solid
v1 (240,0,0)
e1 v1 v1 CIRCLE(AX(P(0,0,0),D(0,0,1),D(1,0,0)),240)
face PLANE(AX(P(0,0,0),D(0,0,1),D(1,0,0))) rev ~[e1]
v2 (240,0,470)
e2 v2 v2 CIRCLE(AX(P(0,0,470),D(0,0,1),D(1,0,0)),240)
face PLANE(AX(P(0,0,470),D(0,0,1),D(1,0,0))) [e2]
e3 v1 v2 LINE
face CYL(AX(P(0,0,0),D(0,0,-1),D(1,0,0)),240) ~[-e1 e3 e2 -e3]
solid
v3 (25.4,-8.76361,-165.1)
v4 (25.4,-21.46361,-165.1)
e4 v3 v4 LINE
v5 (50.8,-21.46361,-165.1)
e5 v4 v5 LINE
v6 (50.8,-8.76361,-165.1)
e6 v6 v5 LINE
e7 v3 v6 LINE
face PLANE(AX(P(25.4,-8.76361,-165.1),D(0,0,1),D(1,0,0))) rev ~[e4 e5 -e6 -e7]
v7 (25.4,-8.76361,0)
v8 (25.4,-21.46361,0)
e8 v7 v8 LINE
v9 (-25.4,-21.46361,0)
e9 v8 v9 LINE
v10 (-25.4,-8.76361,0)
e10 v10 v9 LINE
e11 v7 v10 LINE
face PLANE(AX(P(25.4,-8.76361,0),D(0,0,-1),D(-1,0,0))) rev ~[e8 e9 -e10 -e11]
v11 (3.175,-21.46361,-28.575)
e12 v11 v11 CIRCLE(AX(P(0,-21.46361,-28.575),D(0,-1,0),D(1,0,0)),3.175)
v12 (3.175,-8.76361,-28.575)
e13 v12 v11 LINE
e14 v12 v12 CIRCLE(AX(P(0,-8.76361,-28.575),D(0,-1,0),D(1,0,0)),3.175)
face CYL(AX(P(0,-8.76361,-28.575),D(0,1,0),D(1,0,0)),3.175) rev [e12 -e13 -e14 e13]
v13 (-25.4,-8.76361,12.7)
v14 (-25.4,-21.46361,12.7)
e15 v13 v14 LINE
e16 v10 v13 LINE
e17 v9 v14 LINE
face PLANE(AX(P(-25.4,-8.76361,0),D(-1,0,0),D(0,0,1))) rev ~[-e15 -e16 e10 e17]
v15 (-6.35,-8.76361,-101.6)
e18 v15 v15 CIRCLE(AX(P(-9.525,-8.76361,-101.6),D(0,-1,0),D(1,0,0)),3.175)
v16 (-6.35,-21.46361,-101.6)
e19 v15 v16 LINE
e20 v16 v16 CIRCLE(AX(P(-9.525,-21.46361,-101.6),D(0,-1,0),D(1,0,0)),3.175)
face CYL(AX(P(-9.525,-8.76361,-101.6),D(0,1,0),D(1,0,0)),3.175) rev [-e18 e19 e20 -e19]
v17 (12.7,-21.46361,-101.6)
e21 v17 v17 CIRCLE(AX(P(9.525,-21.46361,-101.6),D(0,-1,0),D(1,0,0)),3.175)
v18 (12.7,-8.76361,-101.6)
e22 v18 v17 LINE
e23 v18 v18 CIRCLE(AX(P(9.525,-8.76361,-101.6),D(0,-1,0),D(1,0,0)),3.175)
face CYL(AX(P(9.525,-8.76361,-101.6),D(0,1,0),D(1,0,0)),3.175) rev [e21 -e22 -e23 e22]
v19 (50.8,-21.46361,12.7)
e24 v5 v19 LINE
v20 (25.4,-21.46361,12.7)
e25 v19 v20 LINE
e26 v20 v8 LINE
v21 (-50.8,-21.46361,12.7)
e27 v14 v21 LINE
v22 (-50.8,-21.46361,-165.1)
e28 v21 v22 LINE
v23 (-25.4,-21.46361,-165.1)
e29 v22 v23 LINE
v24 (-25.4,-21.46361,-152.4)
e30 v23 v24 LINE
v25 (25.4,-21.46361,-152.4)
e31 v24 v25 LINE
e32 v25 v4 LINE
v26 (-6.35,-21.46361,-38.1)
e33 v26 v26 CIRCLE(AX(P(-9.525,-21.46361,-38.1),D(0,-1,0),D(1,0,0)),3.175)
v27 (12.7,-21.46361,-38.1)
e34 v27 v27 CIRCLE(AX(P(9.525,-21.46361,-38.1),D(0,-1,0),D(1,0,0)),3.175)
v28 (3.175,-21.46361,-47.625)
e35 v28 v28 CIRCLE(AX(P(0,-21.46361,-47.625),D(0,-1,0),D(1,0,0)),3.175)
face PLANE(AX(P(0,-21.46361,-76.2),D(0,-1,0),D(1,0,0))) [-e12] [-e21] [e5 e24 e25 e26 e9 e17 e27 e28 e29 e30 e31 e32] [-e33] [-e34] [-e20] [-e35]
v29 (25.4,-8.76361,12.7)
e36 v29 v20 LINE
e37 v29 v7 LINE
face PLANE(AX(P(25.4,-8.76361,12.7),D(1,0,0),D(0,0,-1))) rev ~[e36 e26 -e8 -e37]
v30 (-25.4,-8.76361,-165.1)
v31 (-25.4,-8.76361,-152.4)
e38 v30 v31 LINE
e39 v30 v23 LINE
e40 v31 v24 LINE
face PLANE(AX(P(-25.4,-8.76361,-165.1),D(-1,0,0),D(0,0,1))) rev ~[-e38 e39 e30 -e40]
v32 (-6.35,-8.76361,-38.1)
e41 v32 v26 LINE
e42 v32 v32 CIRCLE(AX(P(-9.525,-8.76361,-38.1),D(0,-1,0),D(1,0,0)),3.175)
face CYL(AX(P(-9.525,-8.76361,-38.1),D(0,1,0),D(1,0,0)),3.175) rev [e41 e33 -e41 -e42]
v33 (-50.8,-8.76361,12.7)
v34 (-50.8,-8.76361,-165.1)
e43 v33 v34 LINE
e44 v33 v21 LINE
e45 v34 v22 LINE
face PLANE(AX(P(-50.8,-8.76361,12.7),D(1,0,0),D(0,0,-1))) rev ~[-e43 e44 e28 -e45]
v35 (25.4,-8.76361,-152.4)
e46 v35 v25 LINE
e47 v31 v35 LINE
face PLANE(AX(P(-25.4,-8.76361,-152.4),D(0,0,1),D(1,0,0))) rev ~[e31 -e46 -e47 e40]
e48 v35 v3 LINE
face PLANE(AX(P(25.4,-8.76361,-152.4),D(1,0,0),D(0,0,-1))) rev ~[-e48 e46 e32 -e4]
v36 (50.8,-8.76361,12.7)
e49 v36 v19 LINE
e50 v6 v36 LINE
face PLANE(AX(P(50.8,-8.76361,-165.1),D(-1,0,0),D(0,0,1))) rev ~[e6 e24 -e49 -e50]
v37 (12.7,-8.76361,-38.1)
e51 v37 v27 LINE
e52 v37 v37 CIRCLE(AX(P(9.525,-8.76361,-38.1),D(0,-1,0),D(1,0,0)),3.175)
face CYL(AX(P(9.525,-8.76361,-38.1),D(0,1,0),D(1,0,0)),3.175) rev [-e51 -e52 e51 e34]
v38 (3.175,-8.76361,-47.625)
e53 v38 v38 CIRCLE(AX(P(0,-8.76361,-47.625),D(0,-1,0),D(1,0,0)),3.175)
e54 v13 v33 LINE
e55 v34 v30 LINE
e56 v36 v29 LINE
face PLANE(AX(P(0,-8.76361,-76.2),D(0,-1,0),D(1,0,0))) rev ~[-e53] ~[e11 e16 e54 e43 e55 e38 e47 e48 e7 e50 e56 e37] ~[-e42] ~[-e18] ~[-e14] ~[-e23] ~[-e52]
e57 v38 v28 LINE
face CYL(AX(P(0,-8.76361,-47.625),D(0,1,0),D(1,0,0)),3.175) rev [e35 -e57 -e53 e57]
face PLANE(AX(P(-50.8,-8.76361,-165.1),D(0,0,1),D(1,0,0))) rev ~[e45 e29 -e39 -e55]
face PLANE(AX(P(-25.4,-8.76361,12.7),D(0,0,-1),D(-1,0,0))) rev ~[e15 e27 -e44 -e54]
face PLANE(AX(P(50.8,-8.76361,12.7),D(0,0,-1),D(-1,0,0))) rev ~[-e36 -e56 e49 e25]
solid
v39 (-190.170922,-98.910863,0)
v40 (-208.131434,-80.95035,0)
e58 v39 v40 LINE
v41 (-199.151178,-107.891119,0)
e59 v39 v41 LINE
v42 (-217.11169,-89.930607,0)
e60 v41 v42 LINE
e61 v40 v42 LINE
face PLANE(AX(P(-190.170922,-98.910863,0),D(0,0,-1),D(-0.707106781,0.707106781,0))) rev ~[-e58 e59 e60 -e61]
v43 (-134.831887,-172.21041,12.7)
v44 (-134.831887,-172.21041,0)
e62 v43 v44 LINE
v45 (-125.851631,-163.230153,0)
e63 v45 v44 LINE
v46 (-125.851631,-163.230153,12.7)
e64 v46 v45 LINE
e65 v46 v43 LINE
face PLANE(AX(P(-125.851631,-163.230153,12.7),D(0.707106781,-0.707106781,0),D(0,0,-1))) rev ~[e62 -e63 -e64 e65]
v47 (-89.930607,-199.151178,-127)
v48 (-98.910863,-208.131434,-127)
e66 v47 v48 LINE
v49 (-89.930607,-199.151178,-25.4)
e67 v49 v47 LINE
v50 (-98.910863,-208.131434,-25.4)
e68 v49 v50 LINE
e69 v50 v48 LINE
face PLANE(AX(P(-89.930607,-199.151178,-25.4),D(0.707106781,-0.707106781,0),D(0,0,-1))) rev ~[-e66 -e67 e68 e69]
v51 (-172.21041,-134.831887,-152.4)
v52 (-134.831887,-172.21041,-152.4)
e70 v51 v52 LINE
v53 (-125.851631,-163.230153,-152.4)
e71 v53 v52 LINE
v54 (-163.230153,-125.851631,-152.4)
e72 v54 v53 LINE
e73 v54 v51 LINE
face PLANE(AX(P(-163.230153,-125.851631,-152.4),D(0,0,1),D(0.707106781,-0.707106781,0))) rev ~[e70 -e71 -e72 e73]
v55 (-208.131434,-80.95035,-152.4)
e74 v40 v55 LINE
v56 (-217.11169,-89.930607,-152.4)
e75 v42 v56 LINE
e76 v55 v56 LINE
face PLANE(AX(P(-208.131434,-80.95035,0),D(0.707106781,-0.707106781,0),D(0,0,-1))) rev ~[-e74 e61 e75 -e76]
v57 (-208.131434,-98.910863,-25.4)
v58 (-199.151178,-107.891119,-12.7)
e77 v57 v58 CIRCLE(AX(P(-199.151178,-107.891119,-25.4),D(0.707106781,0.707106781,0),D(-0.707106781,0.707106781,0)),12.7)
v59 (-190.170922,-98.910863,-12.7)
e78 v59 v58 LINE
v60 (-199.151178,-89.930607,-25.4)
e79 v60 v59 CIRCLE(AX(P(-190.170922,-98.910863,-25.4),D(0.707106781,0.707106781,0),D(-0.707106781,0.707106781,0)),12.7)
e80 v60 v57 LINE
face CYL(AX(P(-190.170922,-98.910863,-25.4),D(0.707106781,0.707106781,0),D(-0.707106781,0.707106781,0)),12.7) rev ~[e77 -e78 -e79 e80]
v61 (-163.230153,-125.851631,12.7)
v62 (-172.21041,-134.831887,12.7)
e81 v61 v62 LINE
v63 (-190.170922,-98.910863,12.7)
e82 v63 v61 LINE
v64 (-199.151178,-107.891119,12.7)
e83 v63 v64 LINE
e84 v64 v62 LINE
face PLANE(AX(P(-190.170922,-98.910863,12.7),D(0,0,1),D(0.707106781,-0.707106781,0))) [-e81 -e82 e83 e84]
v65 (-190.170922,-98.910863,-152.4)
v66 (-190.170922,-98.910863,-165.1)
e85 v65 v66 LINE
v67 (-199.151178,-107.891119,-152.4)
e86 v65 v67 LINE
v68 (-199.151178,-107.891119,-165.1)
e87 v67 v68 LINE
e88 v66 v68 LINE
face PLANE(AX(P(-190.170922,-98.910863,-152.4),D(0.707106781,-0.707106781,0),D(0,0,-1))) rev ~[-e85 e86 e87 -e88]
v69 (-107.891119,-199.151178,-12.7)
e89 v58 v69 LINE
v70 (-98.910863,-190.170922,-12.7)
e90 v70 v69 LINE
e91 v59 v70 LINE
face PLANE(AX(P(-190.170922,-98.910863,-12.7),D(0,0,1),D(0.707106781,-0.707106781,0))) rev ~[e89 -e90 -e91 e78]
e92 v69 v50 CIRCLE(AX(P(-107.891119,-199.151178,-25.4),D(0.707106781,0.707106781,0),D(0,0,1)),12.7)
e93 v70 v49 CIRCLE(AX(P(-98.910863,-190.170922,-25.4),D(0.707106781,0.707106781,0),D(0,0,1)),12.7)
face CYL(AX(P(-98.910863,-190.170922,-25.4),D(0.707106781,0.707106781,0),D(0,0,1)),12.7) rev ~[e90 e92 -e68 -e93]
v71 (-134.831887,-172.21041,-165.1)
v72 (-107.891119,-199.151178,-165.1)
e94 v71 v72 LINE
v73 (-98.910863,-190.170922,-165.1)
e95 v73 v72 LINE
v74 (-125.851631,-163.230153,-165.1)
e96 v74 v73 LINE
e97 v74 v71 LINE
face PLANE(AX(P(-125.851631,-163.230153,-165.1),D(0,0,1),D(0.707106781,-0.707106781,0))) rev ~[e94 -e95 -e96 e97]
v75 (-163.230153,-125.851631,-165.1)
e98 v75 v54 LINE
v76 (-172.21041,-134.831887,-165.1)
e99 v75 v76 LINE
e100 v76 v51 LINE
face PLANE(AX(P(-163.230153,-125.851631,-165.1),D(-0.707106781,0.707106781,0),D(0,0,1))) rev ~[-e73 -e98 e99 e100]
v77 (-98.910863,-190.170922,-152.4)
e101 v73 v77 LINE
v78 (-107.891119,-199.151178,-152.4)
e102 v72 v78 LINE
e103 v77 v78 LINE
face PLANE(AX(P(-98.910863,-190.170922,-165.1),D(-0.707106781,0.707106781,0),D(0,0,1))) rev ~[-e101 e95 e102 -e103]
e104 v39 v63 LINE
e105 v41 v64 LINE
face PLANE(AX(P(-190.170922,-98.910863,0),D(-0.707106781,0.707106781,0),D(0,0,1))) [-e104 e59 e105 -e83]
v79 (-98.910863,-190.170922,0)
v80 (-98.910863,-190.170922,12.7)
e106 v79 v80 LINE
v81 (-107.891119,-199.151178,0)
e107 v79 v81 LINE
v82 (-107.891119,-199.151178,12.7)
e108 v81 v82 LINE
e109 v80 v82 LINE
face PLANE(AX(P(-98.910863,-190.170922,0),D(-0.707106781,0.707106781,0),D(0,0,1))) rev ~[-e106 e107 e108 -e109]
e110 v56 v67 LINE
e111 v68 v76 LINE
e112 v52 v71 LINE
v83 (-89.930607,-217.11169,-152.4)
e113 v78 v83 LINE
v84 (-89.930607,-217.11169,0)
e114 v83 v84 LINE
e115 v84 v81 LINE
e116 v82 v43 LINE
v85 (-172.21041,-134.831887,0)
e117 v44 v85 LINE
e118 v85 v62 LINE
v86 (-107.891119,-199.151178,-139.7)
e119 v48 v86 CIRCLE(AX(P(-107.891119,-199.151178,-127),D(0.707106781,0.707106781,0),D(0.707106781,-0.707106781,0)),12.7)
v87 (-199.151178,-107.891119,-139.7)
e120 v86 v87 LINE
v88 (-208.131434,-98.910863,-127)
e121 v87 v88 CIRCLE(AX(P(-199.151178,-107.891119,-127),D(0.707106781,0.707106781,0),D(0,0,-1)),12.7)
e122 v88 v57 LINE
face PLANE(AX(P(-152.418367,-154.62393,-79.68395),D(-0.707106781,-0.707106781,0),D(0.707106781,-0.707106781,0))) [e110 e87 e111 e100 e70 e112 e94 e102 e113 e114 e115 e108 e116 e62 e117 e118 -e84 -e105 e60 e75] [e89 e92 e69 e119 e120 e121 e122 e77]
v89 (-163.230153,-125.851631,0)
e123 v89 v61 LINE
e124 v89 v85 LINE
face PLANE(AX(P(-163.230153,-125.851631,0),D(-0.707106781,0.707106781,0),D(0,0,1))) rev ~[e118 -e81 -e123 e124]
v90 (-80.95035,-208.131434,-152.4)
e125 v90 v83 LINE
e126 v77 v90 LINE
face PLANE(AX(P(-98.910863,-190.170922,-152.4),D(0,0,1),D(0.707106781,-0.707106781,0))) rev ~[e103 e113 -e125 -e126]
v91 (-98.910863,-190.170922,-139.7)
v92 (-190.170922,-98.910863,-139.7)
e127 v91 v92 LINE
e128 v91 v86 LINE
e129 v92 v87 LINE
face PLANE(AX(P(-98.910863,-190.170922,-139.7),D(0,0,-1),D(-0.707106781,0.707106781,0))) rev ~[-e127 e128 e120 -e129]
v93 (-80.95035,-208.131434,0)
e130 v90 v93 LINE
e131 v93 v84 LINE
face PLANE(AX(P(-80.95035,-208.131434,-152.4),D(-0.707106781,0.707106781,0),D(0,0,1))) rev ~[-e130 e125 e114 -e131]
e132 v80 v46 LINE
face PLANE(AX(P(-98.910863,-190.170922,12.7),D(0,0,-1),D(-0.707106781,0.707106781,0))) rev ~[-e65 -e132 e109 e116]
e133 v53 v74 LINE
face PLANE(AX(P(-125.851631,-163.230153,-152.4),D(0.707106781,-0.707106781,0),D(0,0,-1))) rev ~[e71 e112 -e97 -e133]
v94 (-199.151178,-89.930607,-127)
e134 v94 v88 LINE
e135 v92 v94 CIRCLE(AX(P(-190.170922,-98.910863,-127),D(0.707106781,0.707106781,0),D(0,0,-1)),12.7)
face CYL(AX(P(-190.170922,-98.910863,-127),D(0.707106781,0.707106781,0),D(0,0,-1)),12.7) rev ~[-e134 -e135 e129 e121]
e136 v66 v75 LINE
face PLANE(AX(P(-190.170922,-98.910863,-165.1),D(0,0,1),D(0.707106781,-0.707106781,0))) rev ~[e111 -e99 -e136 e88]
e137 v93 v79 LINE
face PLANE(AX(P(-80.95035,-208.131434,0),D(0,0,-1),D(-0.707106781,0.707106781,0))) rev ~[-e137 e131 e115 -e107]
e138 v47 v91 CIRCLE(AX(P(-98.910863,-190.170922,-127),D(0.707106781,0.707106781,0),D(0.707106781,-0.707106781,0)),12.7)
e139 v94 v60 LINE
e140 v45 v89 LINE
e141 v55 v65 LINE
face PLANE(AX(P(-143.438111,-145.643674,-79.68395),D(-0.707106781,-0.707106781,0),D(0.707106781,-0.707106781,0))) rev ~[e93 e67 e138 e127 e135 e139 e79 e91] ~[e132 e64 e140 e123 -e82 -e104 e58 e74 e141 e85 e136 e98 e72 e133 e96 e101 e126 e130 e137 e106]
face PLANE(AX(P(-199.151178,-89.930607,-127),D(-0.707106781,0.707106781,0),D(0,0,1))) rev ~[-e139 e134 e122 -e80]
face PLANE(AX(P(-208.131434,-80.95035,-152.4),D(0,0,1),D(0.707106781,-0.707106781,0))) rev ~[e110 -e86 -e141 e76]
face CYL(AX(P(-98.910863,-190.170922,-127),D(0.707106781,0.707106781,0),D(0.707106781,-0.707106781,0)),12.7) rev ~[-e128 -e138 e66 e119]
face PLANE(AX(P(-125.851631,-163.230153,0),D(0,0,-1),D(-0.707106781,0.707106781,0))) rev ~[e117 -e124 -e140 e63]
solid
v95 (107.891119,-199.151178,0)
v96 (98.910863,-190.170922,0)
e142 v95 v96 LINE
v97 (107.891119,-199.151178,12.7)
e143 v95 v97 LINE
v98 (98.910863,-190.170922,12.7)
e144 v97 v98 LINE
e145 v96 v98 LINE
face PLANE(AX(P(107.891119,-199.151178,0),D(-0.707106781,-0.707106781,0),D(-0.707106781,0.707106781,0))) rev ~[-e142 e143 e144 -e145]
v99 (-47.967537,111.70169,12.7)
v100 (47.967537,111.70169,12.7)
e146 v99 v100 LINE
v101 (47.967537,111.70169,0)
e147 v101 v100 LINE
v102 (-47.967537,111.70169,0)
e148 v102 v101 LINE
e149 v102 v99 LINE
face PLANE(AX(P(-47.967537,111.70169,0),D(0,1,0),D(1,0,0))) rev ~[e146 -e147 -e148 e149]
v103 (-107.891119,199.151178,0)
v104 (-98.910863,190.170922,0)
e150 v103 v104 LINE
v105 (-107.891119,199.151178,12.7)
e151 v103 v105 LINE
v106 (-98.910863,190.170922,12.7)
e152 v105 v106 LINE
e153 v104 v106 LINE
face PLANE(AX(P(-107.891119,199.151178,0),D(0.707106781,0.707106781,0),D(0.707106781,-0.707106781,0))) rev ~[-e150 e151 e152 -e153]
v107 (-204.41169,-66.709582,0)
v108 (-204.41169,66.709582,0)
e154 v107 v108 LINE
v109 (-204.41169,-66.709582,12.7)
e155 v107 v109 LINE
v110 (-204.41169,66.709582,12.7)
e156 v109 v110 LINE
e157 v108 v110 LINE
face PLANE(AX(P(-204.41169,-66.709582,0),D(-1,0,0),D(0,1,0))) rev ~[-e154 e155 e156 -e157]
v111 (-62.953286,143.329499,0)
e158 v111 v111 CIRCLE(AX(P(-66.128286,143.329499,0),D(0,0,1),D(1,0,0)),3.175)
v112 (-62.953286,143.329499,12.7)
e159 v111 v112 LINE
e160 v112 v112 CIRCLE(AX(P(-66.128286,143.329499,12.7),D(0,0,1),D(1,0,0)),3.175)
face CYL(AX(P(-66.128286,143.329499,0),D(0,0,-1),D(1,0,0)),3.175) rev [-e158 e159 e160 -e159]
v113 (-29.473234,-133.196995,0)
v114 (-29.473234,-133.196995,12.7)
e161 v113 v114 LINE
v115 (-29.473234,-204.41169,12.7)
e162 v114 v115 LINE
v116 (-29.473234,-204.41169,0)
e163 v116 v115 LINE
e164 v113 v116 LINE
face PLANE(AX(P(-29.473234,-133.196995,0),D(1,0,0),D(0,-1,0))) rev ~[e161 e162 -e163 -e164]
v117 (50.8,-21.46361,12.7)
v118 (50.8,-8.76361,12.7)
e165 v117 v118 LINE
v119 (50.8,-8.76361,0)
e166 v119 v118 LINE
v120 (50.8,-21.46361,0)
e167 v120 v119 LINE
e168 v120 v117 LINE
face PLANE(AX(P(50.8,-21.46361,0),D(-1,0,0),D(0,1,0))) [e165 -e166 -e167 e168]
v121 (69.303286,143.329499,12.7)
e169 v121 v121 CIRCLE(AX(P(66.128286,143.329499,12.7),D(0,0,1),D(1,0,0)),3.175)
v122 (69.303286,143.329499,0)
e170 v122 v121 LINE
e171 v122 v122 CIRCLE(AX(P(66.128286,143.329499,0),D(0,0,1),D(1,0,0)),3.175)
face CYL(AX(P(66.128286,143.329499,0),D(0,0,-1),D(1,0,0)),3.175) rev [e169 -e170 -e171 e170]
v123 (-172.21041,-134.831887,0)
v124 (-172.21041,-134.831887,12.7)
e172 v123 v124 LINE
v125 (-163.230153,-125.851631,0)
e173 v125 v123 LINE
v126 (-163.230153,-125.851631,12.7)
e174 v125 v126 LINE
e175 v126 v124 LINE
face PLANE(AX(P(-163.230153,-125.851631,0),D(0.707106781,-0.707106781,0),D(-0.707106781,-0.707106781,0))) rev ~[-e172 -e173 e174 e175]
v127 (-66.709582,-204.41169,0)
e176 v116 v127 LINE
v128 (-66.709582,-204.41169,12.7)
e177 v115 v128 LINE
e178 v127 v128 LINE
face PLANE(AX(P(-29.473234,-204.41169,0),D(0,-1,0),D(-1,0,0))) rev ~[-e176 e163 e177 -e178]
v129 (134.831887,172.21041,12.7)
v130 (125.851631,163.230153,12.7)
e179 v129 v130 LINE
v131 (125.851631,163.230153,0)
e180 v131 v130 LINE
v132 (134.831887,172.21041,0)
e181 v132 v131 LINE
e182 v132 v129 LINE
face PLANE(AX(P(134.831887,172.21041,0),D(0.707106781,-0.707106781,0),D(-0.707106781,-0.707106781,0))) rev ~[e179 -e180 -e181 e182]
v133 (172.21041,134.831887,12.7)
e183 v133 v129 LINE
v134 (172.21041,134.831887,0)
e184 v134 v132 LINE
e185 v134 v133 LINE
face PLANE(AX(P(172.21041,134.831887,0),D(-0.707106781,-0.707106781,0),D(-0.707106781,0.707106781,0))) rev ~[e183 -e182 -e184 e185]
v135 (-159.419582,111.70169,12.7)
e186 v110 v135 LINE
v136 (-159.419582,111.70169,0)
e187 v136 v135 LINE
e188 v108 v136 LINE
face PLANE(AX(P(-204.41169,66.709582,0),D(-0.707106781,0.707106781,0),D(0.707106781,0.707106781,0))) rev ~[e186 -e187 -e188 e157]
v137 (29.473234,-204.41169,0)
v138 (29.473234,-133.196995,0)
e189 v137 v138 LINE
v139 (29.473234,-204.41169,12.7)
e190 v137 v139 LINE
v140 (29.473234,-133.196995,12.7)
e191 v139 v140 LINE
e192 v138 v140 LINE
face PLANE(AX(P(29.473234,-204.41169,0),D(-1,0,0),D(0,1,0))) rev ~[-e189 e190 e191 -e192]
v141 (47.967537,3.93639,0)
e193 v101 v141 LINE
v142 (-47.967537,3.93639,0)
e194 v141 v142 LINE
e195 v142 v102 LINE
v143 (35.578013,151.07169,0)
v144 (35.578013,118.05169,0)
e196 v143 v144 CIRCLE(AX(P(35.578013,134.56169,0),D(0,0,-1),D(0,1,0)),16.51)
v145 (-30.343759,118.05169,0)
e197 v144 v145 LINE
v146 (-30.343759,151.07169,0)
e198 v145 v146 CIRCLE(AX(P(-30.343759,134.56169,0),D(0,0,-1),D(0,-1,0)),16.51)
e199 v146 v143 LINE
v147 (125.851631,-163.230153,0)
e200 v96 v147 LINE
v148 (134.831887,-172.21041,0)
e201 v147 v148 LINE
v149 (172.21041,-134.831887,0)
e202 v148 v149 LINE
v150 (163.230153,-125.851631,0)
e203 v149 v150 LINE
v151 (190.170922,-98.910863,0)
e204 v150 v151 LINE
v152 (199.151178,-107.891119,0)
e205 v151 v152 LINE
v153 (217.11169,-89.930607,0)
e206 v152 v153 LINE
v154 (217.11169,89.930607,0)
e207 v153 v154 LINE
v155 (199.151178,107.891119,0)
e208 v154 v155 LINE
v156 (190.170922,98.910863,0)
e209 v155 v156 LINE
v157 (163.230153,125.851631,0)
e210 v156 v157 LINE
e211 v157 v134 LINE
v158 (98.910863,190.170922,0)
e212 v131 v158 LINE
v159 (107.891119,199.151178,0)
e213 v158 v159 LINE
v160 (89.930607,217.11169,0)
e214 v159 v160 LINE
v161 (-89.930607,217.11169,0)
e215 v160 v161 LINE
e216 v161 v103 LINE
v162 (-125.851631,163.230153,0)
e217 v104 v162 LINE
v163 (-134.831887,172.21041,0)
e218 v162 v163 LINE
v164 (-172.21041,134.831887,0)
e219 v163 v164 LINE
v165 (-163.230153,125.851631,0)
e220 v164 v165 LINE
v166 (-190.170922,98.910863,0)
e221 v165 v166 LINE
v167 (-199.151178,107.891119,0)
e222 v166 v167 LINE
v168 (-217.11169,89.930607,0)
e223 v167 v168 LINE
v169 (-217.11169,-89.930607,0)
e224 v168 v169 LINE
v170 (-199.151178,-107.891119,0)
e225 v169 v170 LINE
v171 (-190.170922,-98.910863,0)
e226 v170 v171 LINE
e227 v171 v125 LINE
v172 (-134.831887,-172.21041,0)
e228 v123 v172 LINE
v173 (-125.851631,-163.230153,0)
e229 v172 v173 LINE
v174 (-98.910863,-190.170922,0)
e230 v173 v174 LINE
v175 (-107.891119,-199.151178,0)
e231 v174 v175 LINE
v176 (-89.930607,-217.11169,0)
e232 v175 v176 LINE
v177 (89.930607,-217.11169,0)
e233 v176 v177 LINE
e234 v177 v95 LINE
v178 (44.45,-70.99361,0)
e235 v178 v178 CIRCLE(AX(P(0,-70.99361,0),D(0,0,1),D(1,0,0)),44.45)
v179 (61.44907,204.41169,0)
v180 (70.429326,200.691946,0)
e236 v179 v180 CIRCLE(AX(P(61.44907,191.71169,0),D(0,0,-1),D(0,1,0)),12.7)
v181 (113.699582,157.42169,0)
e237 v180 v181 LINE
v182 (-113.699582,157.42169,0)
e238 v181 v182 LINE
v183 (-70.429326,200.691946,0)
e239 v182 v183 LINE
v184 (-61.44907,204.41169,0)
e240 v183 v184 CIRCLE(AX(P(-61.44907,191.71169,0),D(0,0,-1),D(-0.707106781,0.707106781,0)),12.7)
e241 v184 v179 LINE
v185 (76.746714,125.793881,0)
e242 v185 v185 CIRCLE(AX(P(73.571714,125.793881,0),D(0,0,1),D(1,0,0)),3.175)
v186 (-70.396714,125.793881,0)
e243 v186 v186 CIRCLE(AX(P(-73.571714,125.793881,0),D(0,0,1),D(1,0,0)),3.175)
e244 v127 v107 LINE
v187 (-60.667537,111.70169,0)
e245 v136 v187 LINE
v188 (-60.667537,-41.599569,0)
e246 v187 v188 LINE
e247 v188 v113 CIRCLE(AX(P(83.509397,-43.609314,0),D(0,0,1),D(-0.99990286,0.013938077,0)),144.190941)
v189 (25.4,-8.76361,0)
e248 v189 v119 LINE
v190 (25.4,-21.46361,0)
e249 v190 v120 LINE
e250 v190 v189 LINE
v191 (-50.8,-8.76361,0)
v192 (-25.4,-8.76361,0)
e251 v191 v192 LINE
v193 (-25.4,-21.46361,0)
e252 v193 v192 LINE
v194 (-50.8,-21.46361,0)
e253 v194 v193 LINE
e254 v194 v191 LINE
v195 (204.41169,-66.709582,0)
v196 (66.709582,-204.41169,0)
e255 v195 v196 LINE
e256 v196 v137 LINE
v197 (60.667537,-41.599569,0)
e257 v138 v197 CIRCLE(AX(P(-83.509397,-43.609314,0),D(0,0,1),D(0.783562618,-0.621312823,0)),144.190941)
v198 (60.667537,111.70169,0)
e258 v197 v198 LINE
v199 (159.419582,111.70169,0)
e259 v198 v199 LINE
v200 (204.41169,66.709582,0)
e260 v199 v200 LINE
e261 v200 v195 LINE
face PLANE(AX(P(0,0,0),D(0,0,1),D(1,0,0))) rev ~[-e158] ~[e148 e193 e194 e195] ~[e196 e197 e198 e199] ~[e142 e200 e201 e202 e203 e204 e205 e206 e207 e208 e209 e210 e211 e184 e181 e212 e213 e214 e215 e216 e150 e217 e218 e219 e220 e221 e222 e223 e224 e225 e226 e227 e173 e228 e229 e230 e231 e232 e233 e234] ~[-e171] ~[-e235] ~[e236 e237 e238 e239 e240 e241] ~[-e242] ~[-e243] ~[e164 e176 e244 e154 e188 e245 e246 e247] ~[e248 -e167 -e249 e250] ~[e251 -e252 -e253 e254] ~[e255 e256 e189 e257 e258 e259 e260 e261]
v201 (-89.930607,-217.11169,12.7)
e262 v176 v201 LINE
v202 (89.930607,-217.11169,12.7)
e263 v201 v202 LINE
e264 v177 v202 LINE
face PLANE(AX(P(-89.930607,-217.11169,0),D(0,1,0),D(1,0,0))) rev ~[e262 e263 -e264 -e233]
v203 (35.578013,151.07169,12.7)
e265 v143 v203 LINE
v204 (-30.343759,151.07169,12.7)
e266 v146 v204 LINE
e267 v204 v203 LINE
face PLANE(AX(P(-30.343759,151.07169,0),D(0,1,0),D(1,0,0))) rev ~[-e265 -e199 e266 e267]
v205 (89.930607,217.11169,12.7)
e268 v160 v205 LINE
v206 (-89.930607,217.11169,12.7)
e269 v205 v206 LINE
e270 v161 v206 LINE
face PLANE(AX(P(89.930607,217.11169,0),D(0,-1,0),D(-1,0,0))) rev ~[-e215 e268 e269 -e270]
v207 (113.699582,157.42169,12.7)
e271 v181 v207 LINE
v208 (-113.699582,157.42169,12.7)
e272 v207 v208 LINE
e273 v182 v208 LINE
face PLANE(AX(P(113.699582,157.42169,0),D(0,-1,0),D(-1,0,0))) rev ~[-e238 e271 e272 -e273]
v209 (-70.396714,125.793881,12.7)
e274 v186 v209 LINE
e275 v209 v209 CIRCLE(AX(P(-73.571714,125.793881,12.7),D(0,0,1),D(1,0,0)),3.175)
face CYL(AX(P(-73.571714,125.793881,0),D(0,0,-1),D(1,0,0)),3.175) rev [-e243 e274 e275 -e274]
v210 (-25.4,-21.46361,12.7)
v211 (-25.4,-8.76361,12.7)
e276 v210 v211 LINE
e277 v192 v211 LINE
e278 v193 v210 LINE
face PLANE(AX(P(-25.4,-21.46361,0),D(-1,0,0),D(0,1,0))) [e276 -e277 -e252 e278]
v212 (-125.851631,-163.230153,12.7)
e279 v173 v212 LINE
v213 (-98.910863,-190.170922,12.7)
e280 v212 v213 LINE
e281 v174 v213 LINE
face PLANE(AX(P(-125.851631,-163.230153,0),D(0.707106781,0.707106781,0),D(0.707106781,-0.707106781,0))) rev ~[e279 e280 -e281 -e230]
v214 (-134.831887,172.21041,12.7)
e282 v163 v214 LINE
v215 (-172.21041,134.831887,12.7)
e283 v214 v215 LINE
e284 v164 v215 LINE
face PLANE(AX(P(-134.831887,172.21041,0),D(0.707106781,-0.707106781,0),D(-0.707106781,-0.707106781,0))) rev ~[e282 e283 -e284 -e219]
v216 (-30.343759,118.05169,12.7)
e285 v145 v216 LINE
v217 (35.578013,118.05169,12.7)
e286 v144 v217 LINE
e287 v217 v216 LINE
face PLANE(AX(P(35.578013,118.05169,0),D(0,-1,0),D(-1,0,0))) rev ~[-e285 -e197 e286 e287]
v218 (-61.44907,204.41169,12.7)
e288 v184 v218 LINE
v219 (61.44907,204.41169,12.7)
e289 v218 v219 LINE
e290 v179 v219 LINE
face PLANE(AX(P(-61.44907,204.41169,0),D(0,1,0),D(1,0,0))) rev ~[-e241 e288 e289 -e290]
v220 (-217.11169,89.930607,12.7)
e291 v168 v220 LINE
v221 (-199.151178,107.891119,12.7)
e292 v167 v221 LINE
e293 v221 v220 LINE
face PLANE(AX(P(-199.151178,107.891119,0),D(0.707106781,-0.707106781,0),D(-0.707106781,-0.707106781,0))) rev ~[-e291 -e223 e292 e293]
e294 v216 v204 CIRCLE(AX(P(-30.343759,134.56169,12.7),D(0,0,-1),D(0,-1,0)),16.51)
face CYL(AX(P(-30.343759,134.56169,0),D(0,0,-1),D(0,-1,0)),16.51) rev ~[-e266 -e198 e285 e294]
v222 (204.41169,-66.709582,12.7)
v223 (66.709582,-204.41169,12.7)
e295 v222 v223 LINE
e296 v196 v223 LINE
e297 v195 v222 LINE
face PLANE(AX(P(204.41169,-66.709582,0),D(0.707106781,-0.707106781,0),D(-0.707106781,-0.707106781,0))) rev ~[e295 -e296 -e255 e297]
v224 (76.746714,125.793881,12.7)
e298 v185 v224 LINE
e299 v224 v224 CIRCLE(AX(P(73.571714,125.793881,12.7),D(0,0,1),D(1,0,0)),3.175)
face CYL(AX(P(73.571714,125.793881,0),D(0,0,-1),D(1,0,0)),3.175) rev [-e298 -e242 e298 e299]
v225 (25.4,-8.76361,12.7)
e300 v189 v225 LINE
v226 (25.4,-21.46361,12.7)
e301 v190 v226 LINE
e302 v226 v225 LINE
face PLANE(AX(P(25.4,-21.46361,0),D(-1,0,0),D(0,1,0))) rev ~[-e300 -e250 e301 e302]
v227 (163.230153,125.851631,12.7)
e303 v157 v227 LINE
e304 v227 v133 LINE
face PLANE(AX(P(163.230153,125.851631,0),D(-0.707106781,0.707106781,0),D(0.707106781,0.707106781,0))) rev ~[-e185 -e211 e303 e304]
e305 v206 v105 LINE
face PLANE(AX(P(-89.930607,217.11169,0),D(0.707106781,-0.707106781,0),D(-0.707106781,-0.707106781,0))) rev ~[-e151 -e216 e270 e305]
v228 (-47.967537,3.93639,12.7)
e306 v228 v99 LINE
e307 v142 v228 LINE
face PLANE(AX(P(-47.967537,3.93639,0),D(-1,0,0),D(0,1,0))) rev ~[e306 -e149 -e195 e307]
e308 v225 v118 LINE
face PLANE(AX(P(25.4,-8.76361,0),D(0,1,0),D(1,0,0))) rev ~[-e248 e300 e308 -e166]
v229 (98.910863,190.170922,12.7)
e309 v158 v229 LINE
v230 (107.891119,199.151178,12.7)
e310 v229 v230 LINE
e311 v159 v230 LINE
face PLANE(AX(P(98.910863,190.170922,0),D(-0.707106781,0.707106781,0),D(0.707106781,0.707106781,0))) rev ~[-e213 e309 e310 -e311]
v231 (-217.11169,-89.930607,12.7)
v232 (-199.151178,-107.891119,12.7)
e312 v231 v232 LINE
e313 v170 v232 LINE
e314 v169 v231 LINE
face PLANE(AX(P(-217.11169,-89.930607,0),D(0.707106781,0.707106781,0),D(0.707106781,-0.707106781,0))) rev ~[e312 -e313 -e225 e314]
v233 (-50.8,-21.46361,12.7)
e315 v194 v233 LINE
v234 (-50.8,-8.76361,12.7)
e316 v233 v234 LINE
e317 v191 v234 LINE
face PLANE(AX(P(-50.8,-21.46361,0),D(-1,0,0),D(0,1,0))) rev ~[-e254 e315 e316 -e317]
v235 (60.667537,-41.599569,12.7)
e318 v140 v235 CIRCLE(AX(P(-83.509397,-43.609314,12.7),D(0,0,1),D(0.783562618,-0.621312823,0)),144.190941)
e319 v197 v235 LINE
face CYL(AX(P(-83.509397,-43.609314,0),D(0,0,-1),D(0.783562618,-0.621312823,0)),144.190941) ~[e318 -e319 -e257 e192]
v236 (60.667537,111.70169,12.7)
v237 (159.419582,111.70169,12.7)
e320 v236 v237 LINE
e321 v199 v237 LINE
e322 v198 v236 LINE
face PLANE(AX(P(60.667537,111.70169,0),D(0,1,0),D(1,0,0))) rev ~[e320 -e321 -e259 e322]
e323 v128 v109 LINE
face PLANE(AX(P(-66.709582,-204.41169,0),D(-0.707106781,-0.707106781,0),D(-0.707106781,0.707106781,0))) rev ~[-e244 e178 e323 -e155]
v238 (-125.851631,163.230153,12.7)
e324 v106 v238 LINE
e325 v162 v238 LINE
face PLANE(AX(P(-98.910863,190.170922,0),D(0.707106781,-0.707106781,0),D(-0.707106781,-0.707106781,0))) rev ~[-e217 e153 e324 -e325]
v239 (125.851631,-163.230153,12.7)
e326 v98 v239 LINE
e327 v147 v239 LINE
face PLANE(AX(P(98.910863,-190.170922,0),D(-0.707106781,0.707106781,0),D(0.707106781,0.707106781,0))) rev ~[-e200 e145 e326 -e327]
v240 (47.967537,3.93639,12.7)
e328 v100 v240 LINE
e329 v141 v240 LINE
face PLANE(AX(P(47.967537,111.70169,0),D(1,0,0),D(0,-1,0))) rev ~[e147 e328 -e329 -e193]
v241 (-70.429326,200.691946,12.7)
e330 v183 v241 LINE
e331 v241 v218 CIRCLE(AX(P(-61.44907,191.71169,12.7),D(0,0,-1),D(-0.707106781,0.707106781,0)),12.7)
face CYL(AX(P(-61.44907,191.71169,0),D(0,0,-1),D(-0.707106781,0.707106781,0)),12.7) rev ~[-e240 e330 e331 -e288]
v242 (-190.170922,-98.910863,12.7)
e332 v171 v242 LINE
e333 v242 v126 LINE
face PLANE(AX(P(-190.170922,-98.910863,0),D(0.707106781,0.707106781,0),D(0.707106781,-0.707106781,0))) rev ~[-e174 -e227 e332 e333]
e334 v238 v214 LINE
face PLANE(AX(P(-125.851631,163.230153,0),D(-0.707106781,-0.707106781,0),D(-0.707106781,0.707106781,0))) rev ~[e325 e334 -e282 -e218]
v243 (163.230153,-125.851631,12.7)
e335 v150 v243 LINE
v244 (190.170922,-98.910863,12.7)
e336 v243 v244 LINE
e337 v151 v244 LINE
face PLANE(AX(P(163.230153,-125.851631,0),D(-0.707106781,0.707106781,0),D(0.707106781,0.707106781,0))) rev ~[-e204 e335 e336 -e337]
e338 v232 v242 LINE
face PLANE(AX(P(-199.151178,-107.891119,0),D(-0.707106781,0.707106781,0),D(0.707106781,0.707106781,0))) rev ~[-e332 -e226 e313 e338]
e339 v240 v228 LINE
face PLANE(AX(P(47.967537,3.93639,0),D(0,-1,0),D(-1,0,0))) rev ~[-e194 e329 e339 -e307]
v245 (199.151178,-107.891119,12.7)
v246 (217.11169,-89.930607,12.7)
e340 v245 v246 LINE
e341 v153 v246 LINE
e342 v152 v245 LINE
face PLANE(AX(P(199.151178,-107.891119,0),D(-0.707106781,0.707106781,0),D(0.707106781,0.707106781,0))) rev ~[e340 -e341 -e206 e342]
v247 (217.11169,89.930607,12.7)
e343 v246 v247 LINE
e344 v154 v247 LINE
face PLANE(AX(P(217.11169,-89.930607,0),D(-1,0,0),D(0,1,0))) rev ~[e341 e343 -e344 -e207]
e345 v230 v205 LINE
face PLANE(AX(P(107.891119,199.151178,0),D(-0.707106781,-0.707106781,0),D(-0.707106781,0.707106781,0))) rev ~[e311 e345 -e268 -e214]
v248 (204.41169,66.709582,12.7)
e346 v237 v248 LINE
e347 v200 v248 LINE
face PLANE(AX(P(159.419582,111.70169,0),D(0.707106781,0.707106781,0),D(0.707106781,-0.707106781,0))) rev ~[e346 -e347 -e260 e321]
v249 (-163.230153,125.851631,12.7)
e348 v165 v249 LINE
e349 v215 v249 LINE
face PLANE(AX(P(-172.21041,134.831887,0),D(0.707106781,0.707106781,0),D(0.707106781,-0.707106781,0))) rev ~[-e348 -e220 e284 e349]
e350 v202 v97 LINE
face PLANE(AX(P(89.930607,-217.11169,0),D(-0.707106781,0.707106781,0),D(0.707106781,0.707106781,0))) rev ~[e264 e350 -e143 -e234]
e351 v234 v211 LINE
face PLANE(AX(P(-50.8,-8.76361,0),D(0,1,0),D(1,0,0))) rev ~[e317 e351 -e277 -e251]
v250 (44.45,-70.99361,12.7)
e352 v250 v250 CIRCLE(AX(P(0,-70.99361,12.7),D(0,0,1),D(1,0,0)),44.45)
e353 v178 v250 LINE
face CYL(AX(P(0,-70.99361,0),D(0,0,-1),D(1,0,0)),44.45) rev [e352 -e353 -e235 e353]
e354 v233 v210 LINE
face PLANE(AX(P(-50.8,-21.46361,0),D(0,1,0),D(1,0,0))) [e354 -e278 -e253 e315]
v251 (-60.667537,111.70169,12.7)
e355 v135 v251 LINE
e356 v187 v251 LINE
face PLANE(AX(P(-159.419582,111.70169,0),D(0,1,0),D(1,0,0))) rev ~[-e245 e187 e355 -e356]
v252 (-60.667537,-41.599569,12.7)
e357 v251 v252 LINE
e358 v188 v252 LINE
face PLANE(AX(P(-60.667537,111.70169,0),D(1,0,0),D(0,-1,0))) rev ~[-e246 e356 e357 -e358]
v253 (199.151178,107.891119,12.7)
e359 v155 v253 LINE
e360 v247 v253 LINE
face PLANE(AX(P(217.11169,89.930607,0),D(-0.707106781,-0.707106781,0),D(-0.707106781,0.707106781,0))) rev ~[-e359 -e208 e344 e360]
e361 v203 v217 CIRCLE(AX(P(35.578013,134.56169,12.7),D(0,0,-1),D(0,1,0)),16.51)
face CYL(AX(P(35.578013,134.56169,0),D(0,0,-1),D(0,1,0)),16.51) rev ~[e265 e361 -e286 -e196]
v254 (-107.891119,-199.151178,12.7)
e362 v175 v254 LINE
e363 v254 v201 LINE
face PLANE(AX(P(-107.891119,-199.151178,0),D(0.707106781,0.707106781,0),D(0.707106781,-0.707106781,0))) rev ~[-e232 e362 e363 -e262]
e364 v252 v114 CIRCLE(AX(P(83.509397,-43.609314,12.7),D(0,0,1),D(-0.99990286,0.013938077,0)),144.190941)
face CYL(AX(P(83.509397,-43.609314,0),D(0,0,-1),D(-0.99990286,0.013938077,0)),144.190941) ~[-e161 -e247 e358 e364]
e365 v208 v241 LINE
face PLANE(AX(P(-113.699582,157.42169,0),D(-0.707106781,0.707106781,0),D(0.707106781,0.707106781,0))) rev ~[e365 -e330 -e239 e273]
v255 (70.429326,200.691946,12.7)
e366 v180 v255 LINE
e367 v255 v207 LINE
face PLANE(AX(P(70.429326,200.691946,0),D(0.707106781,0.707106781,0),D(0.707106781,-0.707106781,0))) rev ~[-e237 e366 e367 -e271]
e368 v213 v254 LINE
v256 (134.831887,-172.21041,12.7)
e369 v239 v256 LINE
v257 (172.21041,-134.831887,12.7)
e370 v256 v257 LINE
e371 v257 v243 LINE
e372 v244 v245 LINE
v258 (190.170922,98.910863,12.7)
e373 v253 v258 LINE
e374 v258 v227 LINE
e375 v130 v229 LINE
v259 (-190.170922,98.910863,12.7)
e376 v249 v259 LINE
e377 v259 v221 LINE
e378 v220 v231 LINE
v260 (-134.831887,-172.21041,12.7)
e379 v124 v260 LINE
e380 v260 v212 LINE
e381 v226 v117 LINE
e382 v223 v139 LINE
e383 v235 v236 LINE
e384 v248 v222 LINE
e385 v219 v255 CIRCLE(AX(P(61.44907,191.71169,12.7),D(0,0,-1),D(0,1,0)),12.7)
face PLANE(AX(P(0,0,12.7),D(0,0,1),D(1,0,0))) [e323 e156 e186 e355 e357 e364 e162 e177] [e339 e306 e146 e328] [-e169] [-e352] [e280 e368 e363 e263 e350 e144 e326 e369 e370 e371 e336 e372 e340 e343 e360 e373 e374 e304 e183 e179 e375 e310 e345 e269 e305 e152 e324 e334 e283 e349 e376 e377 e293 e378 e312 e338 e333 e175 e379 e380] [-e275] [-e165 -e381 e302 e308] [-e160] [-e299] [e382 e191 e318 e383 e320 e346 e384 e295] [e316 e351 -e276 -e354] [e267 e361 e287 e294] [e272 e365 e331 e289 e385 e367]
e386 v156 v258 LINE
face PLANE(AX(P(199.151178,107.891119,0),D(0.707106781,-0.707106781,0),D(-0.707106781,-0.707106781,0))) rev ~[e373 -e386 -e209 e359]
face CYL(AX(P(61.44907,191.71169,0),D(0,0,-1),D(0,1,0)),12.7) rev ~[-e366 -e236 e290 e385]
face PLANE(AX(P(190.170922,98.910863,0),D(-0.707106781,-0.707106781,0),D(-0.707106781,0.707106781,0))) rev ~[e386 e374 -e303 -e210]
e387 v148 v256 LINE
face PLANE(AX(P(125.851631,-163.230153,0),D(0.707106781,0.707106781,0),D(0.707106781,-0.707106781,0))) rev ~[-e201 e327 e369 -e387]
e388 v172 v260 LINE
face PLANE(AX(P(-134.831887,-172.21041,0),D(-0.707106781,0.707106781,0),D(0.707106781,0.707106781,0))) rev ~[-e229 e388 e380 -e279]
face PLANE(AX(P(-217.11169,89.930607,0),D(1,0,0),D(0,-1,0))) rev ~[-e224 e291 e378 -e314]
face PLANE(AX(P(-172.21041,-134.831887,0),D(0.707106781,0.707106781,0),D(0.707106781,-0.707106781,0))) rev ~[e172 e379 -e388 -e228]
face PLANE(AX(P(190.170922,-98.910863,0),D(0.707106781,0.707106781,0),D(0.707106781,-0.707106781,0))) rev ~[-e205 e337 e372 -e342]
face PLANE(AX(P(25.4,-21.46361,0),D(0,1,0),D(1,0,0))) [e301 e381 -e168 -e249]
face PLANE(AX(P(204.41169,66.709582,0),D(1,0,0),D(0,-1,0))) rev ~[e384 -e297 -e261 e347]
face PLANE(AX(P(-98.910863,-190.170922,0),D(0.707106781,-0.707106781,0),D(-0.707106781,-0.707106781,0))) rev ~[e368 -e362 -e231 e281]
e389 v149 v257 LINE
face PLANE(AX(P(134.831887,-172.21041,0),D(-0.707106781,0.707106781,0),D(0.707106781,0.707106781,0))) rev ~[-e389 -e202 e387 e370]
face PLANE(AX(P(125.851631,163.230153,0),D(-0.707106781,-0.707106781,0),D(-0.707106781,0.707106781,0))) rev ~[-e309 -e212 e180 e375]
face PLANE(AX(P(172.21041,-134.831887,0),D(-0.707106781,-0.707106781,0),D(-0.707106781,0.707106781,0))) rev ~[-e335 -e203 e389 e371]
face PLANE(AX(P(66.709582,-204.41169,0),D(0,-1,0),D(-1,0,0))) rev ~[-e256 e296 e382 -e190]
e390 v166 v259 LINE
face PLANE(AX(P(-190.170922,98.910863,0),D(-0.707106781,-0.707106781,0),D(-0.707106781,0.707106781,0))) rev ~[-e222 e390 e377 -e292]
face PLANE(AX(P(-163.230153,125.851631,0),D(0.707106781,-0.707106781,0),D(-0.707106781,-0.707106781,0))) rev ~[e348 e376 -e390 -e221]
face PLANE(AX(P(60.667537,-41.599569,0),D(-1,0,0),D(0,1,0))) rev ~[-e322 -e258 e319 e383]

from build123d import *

# Parameters (mm, degrees)
F0_R     = 240
F1_DEPTH = 470
F2_R     = 3.175
F2_W     = 25.4
F2_H     = 12.7
F2_R_2   = 44.45
F3_DEPTH = 12.7
F4_W     = 38.1
F4_H     = 12.7
F5_DEPTH = 12.7
F6_R     = 3.175
F7_DEPTH = 12.7


# Not quite as in the source:
# - a feature names something its author has since deleted; it is built from what else it names


with BuildPart() as f1:
    # F0 (on Top) → F1 (new body)
    with BuildSketch(Plane.XY):
        Circle(F0_R)
    extrude(amount=F1_DEPTH)


with BuildPart() as f3:
    # F2 (on Top) → F3 (new body)
    with BuildSketch(Plane.XY):
        Polygon((107.8911188479, 199.151177898), (89.9306066058, 217.1116901402), (-89.9306066058, 217.1116901402), (-107.8911188479, 199.151177898), (-98.9108627269, 190.1709217769), (-125.8516310901, 163.2301534137), (-134.8318872111, 172.2104095348), (-172.2104095348, 134.8318872111), (-163.2301534137, 125.8516310901), (-190.1709217769, 98.9108627269), (-199.151177898, 107.8911188479), (-217.1116901402, 89.9306066058), (-217.1116901402, -89.9306066058), (-199.151177898, -107.8911188479), (-190.1709217769, -98.9108627269), (-163.2301534137, -125.8516310901), (-172.2104095348, -134.8318872111), (-134.8318872111, -172.2104095348), (-125.8516310901, -163.2301534137), (-98.9108627269, -190.1709217769), (-107.8911188479, -199.151177898), (-89.9306066058, -217.1116901402), (89.9306066058, -217.1116901402), (107.8911188479, -199.151177898), (98.9108627269, -190.1709217769), (125.8516310901, -163.2301534137), (134.8318872111, -172.2104095348), (172.2104095348, -134.8318872111), (163.2301534137, -125.8516310901), (190.1709217769, -98.9108627269), (199.151177898, -107.8911188479), (217.1116901402, -89.9306066058), (217.1116901402, 89.9306066058), (199.151177898, 107.8911188479), (190.1709217769, 98.9108627269), (163.2301534137, 125.8516310901), (172.2104095348, 134.8318872111), (134.8318872111, 172.2104095348), (125.8516310901, 163.2301534137), (98.9108627269, 190.1709217769), align=None)
        Polygon((-204.4116901402, -66.7095821215), (-204.4116901402, 66.7095821215), (-159.4195821215, 111.7016901402), (-60.6675371528, 111.7016901402), (-47.9675371528, 111.7016901402), (47.9675371528, 111.7016901402), (60.6675371528, 111.7016901402), (159.4195821215, 111.7016901402), (204.4116901402, 66.7095821215), (204.4116901402, -66.7095821215), (66.7095821215, -204.4116901402), (29.473233968, -204.4116901402), (-29.473233968, -204.4116901402), (-66.7095821215, -204.4116901402), align=None, mode=Mode.SUBTRACT)
        with Locations((-73.5717139989, 125.793881411)):
            Circle(F2_R, mode=Mode.SUBTRACT)
        with Locations((-66.1282860011, 143.3294988693)):
            Circle(F2_R, mode=Mode.SUBTRACT)
        with BuildLine():
            ThreePointArc((-30.343759404, 118.0516901402), (-46.853759404, 134.5616901402), (-30.343759404, 151.0716901402))
            Line((-30.343759404, 151.0716901402), (35.57801324, 151.0716901402))
            ThreePointArc((35.57801324, 151.0716901402), (52.08801324, 134.5616901402), (35.57801324, 118.0516901402))
            Line((35.57801324, 118.0516901402), (-30.343759404, 118.0516901402))
        make_face(mode=Mode.SUBTRACT)
        with Locations((73.5717139989, 125.793881411)):
            Circle(F2_R, mode=Mode.SUBTRACT)
        with Locations((66.1282860011, 143.3294988693)):
            Circle(F2_R, mode=Mode.SUBTRACT)
        with BuildLine():
            ThreePointArc((61.4490698794, 204.4116901402), (66.3091494704, 203.444960203), (70.4293260004, 200.6919462612))
            Line((70.4293260004, 200.6919462612), (113.6995821215, 157.4216901402))
            Line((113.6995821215, 157.4216901402), (-113.6995821215, 157.4216901402))
            Line((-113.6995821215, 157.4216901402), (-70.4293260004, 200.6919462612))
            ThreePointArc((-70.4293260004, 200.6919462612), (-66.3091494704, 203.444960203), (-61.4490698794, 204.4116901402))
            Line((-61.4490698794, 204.4116901402), (61.4490698794, 204.4116901402))
        make_face(mode=Mode.SUBTRACT)
        with BuildLine():
            Line((-47.9675371528, 111.7016901402), (-60.6675371528, 111.7016901402))
            Line((-60.6675371528, 111.7016901402), (-60.6675371528, -41.5995694615))
            ThreePointArc((-60.6675371528, -41.5995694615), (-52.9833960385, -90.0931268942), (-29.473233968, -133.1969946623))
            Line((-29.473233968, -133.1969946623), (-29.473233968, -204.4116901402))
            Line((-29.473233968, -204.4116901402), (29.473233968, -204.4116901402))
            Line((29.473233968, -204.4116901402), (29.473233968, -133.1969946623))
            ThreePointArc((29.473233968, -133.1969946623), (52.9833960385, -90.0931268942), (60.6675371528, -41.5995694615))
            Line((60.6675371528, -41.5995694615), (60.6675371528, 111.7016901402))
            Line((60.6675371528, 111.7016901402), (47.9675371528, 111.7016901402))
            Line((47.9675371528, 111.7016901402), (47.9675371528, 3.9363902736))
            Line((47.9675371528, 3.9363902736), (-47.9675371528, 3.9363902736))
            Line((-47.9675371528, 3.9363902736), (-47.9675371528, 111.7016901402))
        make_face()
        with Locations((-38.1, -15.1136097264)):
            Rectangle(F2_W, F2_H, mode=Mode.SUBTRACT)
        with Locations((0, -70.9936097264)):
            Circle(F2_R_2, mode=Mode.SUBTRACT)
        with Locations((38.1, -15.1136097264)):
            Rectangle(F2_W, F2_H, mode=Mode.SUBTRACT)
    extrude(amount=F3_DEPTH)


with BuildPart() as f5:
    # F4 (on face) → F5 (new body)
    with BuildSketch(Plane(origin=(-144.5408922519, -144.5408922519, 0), x_dir=(0.7071067812, -0.7071067812, 0), z_dir=(-0.7071067812, -0.7071067812, 0))):
        Polygon((-26.4306066058, 0), (-64.5306066058, 0), (-89.9306066058, 0), (-89.9306066058, -152.4), (-64.5306066058, -152.4), (-64.5306066058, -165.1), (-26.4306066058, -165.1), (-26.4306066058, -152.4), (26.4306066058, -152.4), (26.4306066058, -165.1), (64.5306066058, -165.1), (64.5306066058, -152.4), (89.9306066058, -152.4), (89.9306066058, 0), (64.5306066058, 0), (64.5306066058, 12.7), (26.4306066058, 12.7), (26.4306066058, 0), align=None)
        with BuildLine():
            Line((-64.5306066058, -12.7), (64.5306066058, -12.7))
            ThreePointArc((64.5306066058, -12.7), (73.5108627269, -16.4197438789), (77.2306066058, -25.4))
            Line((77.2306066058, -25.4), (77.2306066058, -127))
            ThreePointArc((77.2306066058, -127), (73.5108627269, -135.9802561211), (64.5306066058, -139.7))
            Line((64.5306066058, -139.7), (-64.5306066058, -139.7))
            ThreePointArc((-64.5306066058, -139.7), (-73.5108627269, -135.9802561211), (-77.2306066058, -127))
            Line((-77.2306066058, -127), (-77.2306066058, -25.4))
            ThreePointArc((-77.2306066058, -25.4), (-73.5108627269, -16.4197438789), (-64.5306066058, -12.7))
        make_face(mode=Mode.SUBTRACT)
        with Locations((-45.4806066058, 6.35)):
            Rectangle(F4_W, F4_H)
    extrude(amount=F5_DEPTH)


with BuildPart() as f7:
    # F6 (on face) → F7 (new body)
    with BuildSketch(Plane.XZ.offset(8.7636097264)):
        Polygon((25.4, 0), (-25.4, 0), (-25.4, 12.7), (-50.8, 12.7), (-50.8, 0), (-50.8, -152.4), (-50.8, -165.1), (-25.4, -165.1), (-25.4, -152.4), (25.4, -152.4), (25.4, -165.1), (50.8, -165.1), (50.8, -152.4), (50.8, 0), (50.8, 12.7), (25.4, 12.7), align=None)
        with Locations((-9.525, -101.6)):
            Circle(F6_R, mode=Mode.SUBTRACT)
        with Locations((9.525, -101.6)):
            Circle(F6_R, mode=Mode.SUBTRACT)
        with Locations((0, -47.625)):
            Circle(F6_R, mode=Mode.SUBTRACT)
        with Locations((-9.525, -38.1)):
            Circle(F6_R, mode=Mode.SUBTRACT)
        with Locations((0, -28.575)):
            Circle(F6_R, mode=Mode.SUBTRACT)
        with Locations((9.525, -38.1)):
            Circle(F6_R, mode=Mode.SUBTRACT)
    extrude(amount=F7_DEPTH)


solid = Compound([f1.part, f3.part, f5.part, f7.part])
